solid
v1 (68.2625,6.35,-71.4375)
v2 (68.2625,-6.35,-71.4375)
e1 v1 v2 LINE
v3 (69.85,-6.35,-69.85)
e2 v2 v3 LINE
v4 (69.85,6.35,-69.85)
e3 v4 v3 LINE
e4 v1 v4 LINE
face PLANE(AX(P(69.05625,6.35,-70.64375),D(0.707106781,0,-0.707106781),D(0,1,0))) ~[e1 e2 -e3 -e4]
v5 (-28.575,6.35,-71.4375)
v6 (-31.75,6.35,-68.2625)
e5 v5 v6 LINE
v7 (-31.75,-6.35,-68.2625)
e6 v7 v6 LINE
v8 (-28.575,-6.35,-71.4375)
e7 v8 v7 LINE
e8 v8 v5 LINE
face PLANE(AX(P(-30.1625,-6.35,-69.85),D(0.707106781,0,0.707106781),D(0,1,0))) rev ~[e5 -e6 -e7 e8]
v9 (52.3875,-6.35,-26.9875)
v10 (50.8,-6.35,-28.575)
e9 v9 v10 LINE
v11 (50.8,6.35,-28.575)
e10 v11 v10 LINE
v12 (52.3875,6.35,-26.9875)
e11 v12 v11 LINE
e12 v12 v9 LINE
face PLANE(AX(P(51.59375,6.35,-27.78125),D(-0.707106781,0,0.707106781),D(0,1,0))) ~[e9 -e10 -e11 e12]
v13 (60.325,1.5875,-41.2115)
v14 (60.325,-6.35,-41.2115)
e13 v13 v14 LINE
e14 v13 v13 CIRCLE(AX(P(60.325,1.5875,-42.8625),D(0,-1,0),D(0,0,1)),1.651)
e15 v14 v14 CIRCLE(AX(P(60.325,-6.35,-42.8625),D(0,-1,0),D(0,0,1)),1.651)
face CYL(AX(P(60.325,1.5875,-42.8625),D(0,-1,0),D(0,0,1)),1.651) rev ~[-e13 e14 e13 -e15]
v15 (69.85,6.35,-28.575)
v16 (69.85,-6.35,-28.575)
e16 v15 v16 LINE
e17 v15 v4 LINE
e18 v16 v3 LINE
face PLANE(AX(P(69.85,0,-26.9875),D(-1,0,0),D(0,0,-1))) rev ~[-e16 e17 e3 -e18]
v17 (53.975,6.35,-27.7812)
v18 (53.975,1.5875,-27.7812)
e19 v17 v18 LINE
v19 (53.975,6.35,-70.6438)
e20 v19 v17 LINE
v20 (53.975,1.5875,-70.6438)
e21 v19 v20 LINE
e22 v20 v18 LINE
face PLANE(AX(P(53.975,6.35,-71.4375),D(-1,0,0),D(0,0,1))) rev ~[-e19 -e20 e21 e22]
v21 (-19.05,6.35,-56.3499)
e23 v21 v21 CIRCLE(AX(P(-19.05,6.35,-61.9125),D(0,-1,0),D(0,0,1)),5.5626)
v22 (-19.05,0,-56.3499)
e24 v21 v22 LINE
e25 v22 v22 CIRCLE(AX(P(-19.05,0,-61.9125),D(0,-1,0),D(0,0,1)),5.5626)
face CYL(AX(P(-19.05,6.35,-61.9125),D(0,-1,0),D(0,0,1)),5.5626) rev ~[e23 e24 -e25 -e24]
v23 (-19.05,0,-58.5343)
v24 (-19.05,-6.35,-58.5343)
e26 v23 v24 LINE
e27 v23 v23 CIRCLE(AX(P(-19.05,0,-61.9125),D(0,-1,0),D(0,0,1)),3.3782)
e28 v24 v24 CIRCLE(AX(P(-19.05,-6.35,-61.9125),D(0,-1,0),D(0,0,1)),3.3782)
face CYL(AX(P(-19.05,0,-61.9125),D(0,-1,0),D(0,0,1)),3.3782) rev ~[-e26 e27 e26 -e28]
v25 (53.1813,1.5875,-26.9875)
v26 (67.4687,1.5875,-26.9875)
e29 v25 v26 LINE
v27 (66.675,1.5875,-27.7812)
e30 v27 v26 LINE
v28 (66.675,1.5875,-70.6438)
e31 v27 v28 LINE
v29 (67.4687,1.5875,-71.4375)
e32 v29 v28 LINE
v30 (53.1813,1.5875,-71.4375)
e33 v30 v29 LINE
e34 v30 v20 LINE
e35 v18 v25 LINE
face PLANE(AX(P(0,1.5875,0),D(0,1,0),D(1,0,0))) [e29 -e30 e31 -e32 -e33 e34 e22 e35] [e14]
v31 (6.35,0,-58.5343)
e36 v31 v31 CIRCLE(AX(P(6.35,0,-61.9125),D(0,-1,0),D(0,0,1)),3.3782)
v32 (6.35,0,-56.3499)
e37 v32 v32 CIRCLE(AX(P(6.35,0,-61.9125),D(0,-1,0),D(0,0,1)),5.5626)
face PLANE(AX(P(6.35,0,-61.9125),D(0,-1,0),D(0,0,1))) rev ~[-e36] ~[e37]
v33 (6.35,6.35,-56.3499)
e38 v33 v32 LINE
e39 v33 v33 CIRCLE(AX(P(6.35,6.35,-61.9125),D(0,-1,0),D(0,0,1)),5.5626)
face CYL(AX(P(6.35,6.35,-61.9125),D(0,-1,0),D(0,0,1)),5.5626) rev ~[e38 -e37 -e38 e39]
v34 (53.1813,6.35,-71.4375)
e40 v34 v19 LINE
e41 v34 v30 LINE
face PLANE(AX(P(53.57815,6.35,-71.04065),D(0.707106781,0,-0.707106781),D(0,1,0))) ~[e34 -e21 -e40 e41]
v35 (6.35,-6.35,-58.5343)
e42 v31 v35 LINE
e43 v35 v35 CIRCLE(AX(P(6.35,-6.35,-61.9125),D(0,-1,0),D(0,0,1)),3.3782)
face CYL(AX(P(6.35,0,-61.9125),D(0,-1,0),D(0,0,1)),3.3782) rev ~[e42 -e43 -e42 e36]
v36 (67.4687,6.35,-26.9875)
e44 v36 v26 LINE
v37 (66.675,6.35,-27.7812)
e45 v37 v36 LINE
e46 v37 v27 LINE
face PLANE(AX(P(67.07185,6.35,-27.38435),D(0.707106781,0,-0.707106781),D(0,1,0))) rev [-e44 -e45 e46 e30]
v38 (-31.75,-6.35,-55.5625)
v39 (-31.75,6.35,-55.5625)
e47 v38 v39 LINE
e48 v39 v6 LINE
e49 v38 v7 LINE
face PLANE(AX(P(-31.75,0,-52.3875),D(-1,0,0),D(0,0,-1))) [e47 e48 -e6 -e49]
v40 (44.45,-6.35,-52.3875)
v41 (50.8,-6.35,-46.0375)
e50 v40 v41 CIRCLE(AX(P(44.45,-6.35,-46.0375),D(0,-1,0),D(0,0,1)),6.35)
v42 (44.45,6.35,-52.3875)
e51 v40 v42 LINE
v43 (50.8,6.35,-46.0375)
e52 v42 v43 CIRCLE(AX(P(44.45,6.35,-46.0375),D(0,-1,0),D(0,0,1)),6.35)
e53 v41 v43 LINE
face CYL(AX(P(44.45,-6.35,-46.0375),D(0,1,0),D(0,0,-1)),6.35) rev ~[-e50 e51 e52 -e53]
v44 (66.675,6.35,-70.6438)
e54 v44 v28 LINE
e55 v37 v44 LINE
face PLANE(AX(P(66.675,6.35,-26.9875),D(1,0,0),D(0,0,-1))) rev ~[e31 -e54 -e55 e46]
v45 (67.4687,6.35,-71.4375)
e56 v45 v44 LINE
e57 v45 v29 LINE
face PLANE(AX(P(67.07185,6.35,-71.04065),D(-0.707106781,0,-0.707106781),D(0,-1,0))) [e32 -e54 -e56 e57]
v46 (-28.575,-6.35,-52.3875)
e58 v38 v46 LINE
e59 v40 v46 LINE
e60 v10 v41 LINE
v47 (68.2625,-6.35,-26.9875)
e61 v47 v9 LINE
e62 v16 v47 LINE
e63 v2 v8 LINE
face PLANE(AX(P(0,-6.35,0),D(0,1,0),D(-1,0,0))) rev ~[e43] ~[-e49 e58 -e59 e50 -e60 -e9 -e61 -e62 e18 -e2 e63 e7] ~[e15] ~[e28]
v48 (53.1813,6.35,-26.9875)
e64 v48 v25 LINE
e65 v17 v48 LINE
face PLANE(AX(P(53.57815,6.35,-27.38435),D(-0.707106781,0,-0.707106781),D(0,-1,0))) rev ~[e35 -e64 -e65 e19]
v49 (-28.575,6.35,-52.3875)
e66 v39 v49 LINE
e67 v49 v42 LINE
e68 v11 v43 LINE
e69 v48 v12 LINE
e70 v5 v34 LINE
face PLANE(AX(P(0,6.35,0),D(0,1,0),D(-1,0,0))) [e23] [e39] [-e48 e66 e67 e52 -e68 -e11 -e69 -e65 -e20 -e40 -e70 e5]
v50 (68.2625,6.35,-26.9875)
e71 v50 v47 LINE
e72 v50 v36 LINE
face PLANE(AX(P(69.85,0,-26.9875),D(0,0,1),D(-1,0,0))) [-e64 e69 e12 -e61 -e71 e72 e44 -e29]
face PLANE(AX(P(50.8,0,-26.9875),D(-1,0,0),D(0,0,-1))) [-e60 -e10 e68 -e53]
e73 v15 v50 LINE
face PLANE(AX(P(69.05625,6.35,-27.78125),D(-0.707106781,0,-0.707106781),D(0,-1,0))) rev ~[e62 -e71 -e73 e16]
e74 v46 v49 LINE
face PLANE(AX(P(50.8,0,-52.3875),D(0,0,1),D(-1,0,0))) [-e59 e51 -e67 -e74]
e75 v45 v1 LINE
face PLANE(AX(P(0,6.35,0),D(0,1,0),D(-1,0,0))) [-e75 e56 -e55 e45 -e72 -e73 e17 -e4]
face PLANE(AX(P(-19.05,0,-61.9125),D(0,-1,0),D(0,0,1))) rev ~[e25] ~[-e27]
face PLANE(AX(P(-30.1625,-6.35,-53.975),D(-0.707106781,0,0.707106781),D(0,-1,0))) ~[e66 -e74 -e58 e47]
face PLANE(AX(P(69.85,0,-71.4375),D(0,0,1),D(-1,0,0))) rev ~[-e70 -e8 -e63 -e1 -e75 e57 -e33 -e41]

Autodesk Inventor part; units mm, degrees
ref_plane "YZ Plane" through (0, 0, 0) normal (1, 0, 0) x (0, 1, 0)
ref_plane "XZ Plane" through (0, 0, 0) normal (0, 1, 0) x (-1, 0, 0)
ref_plane "XY Plane" through (0, 0, 0) normal (0, 0, 1) x (1, 0, 0)
sketch "Sketch1" plane through (0, 0, 0) normal (0, 1, 0) x (-1, 0, 0)
  line L0 (0, -85.725) -> (0, 14.2875) projected
  line L1 (-90.17, 0) -> (52.07, 0) projected
  line L2 (-50.8, -52.3875) -> (31.75, -52.3875)
  line L3 (-69.85, -71.4375) -> (31.75, -71.4375)
  line L4 (-69.85, -26.9875) -> (-50.8, -26.9875)
  line L5 (-50.8, -26.9875) -> (-50.8, -52.3875)
  line L6 (-69.85, -26.9875) -> (-69.85, -71.4375)
  line L7 (-53.975, -26.9875) -> (-66.675, -26.9875) construction
  line L8 (-66.675, -26.9875) -> (-66.675, -71.4375) construction
  line L9 (-66.675, -71.4375) -> (-53.975, -71.4375) construction
  line L10 (-53.975, -71.4375) -> (-53.975, -26.9875) construction
  line L11 (-60.325, -26.9875) -> (-60.325, -71.4375) construction
  line L12 (31.75, -52.3875) -> (31.75, -71.4375)
  point P0 (0, 0)
  dimension "d3" = 26.9875
  dimension "d5" = 19.05
  dimension "d6" = 3.175
  dimension "d7" = 50.8
  dimension "d11" = 19.05
  dimension "d57" = 101.6
  dimension "d58" = 12.7
  dimension "d59" = 44.45
extrude "Extrusion1" add sketch "Sketch1" along normal mid plane 12.7
sketch "Sketch2" plane through (0, 6.35, 0) normal (0, 1, 0) x (1, 0, 0)
  line L0 (-31.75, 52.3875) -> (50.8, 52.3875) projected
  line L1 (50.8, 52.3875) -> (50.8, 26.9875) projected
  line L2 (50.8, 26.9875) -> (69.85, 26.9875) projected
  line L3 (69.85, 26.9875) -> (69.85, 71.4375) projected
  line L4 (69.85, 71.4375) -> (-31.75, 71.4375) projected
  line L5 (50.8, 26.9875) -> (69.85, 26.9875) projected
  line L6 (69.85, 71.4375) -> (-31.75, 71.4375) projected
  line L7 (53.975, 26.9875) -> (66.675, 26.9875)
  line L8 (66.675, 26.9875) -> (66.675, 71.4375)
  line L9 (66.675, 71.4375) -> (53.975, 71.4375)
  line L10 (53.975, 71.4375) -> (53.975, 26.9875)
  line L11 (60.325, -63.5) -> (60.325, 99.2856) construction
  line L12 (102.235, 0) -> (-124.46, 0) projected
  line L13 (-31.75, 71.4375) -> (-31.75, 52.3875) projected
  point P0 (0, 0)
  point P1 (60.325, 26.9875)
  dimension "d60" = 12.7
  dimension "d61" = 6.35
extrude "Extrusion2" cut sketch "Sketch2" against normal blind 4.7625 contours L4 L8 L2 L10
chamfer "Chamfer1" distance 1.5875 angle 45 3 edges at (69.85, 0, -26.9875) (69.85, 0, -71.4375) (50.8, 0, -26.9875)
sketch "Sketch4" plane through (0, 1.5875, 0) normal (0, 1, 0) x (1, 0, 0)
  line L0 (53.975, 71.4375) -> (66.675, 71.4375) projected
  line L1 (53.975, 26.9875) -> (53.975, 71.4375) projected
  line L2 (66.675, 26.9875) -> (53.975, 26.9875) projected
  line L3 (66.675, 71.4375) -> (66.675, 26.9875) projected
  point P0 (0, 0)
  point P1 (60.325, 42.8625)
  dimension "d44" = 15.875
  dimension "d46" = 6.35
hole "Hole2" at (60.325, 1.5875, -42.8625) direction (0, -1, 0) diameter 3.302 end through all thread size "8-32 UNC" class "2B" standard "ANSI Unified Screw Threads"
chamfer "Chamfer3" distance 0.7937 angle 45 4 edges at (66.675, 3.9687, -26.9875) (53.975, 3.9687, -26.9875) (53.975, 3.9687, -71.4375) (66.675, 3.9687, -71.4375)
sketch "Sketch5" plane through (0, 6.35, 0) normal (0, 1, 0) x (1, 0, 0)
  line L0 (53.1813, 71.4375) -> (53.975, 70.6437) projected
  line L1 (53.1813, 71.4375) -> (-31.75, 71.4375) projected
  line L2 (-31.75, 71.4375) -> (-31.75, 52.3875) projected
  line L3 (-31.75, 52.3875) -> (50.8, 52.3875) projected
  line L4 (50.8, 52.3875) -> (50.8, 28.575) projected
  line L5 (52.3875, 26.9875) -> (50.8, 28.575) projected
  line L6 (52.3875, 26.9875) -> (53.1813, 26.9875) projected
  line L7 (53.975, 27.7812) -> (53.1813, 26.9875) projected
  line L8 (53.975, 27.7812) -> (53.975, 70.6437) projected
  line L9 (-31.75, 71.4375) -> (-31.75, 52.3875) construction
  line L10 (-31.75, 61.9125) -> (53.975, 61.9125) construction
  point P0 (0, 0)
  point P1 (-19.05, 61.9125)
  point P2 (6.35, 61.9125)
  dimension "d62" = 12.7
  dimension "d63" = 25.4
hole "Hole3" at (-19.05, 6.35, -61.9125) at (6.35, 6.35, -61.9125) direction (0, -1, 0) diameter 6.7564 end through all counterbore diameter 11.1252 counterbore depth 6.35 clearance for "Socket Head Cap Screw" size "1/4" standard "Ansi Unified Screw Threads"
chamfer "Chamfer4" distance 3.175 angle 45 2 edges at (-31.75, 0, -52.3875) (-31.75, 0, -71.4375)
fillet "Fillet2" radius 6.35 1 edges at (50.8, 0, -52.3875)
ref_plane "Work Plane3" through (-28.575, -6.35, -61.9125) normal (0, 0, 1) x (1, 0, 0)
ref_plane "Work Plane4" through (60.325, -6.35, -69.85) normal (1, 0, 0) x (0, 0, -1)
equation "\"d3\" = 0.5 * d2"
equation "\"d7\" = 0.5 * d4"
equation "\"d11\" = d10"
equation "\"d61\" = 0.5 * d60"
equation "\"d2\" = 53.975"
equation "\"d4\" = 101.6"
equation "\"d10\" = 19.05"
properties part number "Holder - headbars - L - RH" material "Stainless Steel"
